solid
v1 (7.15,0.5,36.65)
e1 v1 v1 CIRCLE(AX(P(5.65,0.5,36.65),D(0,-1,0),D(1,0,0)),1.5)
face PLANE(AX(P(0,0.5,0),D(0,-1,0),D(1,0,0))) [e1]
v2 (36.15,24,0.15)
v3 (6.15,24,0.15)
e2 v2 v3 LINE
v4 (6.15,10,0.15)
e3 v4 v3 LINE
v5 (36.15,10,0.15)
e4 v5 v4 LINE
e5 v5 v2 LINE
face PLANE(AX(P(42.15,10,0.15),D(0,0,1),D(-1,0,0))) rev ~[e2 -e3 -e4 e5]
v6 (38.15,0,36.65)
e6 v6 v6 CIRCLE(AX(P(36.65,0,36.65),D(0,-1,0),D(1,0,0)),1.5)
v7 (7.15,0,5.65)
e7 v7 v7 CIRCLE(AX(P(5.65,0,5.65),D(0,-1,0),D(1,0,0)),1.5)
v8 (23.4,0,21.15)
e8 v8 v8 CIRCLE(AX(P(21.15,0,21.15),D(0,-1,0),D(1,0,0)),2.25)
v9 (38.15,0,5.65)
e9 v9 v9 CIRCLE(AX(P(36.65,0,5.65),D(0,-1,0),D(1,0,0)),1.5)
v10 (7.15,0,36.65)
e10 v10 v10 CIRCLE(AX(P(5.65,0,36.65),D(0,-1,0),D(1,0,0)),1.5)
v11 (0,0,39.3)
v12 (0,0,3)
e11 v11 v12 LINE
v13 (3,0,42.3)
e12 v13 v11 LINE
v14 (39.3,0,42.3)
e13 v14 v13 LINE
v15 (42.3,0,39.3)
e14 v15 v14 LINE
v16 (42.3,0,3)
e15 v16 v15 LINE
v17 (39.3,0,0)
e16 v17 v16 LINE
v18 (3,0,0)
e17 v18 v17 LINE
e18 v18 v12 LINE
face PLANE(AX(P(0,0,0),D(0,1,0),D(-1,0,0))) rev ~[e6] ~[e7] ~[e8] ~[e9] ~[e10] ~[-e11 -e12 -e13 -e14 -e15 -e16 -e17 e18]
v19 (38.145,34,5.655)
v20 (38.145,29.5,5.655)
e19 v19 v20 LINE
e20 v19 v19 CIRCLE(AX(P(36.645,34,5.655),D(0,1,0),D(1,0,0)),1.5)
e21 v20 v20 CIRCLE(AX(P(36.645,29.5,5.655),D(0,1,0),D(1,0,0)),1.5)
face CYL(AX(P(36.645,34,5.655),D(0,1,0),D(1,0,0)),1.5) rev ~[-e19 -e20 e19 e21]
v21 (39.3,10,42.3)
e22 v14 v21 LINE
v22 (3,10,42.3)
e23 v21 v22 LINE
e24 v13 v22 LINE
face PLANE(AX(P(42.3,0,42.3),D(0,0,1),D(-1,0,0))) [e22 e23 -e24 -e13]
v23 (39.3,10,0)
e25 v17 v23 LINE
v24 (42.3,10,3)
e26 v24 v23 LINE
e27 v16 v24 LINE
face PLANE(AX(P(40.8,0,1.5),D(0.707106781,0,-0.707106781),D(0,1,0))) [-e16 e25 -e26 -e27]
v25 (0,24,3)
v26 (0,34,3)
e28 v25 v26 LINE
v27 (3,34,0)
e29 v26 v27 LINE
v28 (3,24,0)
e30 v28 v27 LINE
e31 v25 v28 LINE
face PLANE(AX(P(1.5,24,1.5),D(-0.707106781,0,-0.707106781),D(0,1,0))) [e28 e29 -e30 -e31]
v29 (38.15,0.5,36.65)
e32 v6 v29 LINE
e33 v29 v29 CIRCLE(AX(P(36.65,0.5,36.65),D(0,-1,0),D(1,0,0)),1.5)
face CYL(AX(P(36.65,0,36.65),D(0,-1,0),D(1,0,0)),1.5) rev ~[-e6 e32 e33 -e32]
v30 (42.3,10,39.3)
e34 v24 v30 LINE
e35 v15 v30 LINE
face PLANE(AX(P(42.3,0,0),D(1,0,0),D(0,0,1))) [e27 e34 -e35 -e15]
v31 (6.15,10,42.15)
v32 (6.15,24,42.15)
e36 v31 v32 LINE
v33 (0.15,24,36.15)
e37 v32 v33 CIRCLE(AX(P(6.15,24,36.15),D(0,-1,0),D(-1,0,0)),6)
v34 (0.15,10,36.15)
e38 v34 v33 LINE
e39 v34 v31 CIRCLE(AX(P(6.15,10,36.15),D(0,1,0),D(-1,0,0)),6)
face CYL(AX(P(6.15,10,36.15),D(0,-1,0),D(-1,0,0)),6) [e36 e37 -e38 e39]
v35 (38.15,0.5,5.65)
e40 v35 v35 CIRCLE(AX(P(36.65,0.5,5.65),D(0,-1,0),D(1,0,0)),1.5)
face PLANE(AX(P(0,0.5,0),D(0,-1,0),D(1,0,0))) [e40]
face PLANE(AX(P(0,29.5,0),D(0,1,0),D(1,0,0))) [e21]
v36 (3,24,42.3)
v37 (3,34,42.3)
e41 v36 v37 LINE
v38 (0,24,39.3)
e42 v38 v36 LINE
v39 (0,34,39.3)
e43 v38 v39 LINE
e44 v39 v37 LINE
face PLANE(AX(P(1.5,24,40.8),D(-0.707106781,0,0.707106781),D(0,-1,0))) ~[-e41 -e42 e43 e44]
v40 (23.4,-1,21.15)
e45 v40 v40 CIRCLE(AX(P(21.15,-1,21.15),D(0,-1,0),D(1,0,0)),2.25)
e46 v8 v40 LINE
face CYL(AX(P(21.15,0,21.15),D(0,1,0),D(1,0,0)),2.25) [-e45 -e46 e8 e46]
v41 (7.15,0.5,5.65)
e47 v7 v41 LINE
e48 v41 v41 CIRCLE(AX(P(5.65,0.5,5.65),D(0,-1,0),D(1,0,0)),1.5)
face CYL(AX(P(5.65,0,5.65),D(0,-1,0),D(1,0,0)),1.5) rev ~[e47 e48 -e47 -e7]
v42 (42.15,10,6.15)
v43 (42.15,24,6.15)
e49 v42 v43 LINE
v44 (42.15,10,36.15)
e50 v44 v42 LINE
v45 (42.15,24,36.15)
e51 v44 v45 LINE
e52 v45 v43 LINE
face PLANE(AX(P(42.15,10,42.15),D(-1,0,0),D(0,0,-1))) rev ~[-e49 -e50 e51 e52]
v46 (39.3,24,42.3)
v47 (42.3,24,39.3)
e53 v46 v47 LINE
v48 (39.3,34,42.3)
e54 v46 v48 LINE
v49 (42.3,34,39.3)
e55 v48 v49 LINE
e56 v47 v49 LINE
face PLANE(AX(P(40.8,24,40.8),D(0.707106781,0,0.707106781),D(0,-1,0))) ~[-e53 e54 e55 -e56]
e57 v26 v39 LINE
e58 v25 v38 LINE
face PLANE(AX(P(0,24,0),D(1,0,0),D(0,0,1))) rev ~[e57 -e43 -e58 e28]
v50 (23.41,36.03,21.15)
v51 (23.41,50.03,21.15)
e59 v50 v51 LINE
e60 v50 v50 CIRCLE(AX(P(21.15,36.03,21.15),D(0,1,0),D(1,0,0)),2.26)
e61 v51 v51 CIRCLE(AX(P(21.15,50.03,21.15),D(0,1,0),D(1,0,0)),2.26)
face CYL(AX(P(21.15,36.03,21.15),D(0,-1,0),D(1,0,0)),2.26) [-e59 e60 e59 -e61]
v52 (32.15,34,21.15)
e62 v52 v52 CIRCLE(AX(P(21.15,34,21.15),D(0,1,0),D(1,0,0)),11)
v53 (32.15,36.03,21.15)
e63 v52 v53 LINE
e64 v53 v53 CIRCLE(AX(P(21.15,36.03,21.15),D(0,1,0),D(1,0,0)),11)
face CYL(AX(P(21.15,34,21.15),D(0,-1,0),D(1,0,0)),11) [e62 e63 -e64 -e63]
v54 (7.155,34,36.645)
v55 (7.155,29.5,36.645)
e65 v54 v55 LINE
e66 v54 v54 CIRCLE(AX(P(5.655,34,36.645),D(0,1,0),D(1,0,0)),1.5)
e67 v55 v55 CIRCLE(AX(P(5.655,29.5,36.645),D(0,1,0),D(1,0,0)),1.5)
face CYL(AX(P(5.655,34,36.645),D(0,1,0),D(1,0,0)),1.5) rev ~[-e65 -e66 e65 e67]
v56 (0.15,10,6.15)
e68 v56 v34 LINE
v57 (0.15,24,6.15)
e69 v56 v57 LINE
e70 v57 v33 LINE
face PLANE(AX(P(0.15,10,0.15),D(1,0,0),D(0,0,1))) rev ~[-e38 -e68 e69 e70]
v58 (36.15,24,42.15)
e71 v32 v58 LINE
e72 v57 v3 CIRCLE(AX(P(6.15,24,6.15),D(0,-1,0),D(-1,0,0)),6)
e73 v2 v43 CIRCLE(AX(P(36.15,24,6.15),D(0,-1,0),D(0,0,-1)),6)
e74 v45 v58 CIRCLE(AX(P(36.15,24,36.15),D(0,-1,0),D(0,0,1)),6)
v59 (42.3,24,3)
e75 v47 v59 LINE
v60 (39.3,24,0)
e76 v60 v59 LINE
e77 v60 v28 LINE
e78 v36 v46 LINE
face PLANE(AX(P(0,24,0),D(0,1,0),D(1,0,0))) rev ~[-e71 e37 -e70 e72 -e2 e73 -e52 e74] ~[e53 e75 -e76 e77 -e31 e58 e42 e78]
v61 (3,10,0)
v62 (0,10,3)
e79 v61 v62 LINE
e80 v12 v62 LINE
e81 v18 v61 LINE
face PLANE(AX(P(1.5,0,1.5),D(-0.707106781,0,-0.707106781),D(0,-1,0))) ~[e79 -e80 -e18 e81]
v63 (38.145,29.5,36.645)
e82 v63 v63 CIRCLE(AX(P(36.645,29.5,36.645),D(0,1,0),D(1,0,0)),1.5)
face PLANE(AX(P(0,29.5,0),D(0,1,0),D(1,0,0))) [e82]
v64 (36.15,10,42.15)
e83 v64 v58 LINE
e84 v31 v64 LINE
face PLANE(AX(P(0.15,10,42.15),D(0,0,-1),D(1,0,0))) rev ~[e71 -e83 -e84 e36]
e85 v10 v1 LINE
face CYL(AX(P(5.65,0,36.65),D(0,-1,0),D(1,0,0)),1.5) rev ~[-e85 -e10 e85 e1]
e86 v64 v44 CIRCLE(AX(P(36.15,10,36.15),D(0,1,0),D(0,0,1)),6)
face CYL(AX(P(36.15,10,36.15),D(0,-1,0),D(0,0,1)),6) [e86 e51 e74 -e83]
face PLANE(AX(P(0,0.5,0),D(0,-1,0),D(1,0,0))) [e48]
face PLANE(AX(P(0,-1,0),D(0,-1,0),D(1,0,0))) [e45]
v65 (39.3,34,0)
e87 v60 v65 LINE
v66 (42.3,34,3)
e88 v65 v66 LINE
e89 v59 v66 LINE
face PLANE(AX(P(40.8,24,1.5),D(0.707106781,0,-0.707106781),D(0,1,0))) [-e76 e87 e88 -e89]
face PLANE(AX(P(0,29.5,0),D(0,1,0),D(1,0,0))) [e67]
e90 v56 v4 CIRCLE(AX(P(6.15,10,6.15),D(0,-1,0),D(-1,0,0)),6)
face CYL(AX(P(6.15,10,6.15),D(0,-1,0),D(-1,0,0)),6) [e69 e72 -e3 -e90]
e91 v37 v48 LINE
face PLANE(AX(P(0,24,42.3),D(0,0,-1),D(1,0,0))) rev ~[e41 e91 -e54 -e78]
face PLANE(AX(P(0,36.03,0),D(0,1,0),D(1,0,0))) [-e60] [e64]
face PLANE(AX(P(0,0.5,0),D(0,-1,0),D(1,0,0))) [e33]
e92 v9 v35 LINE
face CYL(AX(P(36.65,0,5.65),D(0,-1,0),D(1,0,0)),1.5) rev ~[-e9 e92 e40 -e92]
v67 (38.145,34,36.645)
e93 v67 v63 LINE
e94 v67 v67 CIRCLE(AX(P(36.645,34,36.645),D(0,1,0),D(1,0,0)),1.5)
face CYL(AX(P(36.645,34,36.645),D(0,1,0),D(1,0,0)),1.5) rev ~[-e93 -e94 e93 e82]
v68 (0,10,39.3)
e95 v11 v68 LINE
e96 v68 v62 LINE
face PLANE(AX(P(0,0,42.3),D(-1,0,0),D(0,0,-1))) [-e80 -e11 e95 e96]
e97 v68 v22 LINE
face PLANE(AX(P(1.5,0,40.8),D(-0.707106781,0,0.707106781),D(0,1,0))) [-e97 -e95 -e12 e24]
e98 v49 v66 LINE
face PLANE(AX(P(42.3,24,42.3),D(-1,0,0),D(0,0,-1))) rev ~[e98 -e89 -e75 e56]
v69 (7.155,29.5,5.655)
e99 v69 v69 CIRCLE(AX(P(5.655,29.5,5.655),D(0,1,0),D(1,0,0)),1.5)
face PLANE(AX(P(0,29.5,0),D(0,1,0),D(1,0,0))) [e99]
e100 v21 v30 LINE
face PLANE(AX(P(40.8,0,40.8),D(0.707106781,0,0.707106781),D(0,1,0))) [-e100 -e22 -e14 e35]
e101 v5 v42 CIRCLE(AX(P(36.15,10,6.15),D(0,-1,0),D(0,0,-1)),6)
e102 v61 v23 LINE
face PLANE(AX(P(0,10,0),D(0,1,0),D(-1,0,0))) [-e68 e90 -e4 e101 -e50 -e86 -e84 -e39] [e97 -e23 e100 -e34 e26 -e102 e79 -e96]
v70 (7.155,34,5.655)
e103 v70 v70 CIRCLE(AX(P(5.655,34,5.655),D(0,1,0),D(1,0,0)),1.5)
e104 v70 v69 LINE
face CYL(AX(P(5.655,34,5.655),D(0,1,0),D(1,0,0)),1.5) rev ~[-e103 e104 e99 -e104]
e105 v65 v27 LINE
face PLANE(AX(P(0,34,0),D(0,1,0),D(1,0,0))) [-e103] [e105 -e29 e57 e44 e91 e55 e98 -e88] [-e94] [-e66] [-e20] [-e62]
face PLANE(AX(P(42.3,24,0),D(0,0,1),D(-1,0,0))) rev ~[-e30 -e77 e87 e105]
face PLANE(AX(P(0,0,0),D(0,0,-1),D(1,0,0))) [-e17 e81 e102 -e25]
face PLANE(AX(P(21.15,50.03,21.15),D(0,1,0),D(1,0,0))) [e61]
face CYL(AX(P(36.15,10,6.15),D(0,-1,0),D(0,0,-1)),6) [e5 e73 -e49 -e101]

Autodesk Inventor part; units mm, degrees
ref_plane "YZ Plane" through (0, 0, 0) normal (1, 0, 0) x (0, 1, 0)
ref_plane "XZ Plane" through (0, 0, 0) normal (0, 1, 0) x (-1, 0, 0)
sketch "Sketch1" plane through (0, 0, 0) normal (0, 1, 0) x (-1, 0, 0)
  line L0 (0, 0) -> (-42.3, 0)
  line L1 (-42.3, 0) -> (-42.3, 42.3)
  line L2 (-42.3, 42.3) -> (0, 42.3)
  line L3 (0, 42.3) -> (0, 0)
  dimension "d0" = 42.3
  dimension "d1" = 42.3
extrude "Extrusion1" add sketch "Sketch1" along normal blind 10
chamfer "Chamfer1" distance 3 angle 45 4 edges at (42.3, 5, 42.3) (0, 5, 42.3) (0, 5, 0) (42.3, 5, 0)
sketch "Sketch2" plane through (0, 10, 0) normal (0, 1, 0) x (1, 0, 0)
  line L0 (0.15, -42.15) -> (42.15, -42.15)
  line L1 (42.15, -42.15) -> (42.15, -0.15)
  line L2 (42.15, -0.15) -> (0.15, -0.15)
  line L3 (0.15, -0.15) -> (0.15, -42.15)
  line L4 (0.15, -42.15) -> (42.15, -0.15) construction
  line L5 (42.15, -42.15) -> (0.15, -0.15) construction
  point P0 (0, 0)
  point P1 (21.15, -21.15)
  dimension "d7" = 42
  dimension "d8" = 42
extrude "Extrusion2" add sketch "Sketch2" along normal blind 14
fillet "Fillet1" radius 6 4 edges at (42.15, 17, 42.15) (42.15, 17, 0.15) (0.15, 17, 42.15) (0.15, 17, 0.15)
sketch "Sketch3" plane through (0, 24, 0) normal (0, 1, 0) x (1, 0, 0)
  line L0 (0, -42.3) -> (42.3, -42.3)
  line L1 (42.3, -42.3) -> (42.3, 0)
  line L2 (42.3, 0) -> (0, 0)
  line L3 (0, 0) -> (0, -42.3)
  line L4 (0, -42.3) -> (42.3, 0) construction
  line L5 (42.3, -42.3) -> (0, 0) construction
  point P0 (0, 0)
  point P1 (21.15, -21.15)
  dimension "d12" = 42.3
  dimension "d13" = 42.3
extrude "Extrusion3" add sketch "Sketch3" along normal blind 10
chamfer "Chamfer2" distance 3 angle 45 4 edges at (42.3, 29, 42.3) (42.3, 29, 0) (0, 29, 0) (0, 29, 42.3)
ref_plane "Work Plane1" through (39.3, 0, 21.15) normal (0, 0, -1) x (-1, 0, 0)
sketch "Sketch4" plane through (0, 34, 0) normal (0, 1, 0) x (1, 0, 0)
  circle A0 centre (21.15, -21.15) radius 11
  point P0 (0, 0)
  dimension "d19" = 22
extrude "Extrusion4" add sketch "Sketch4" along normal blind 2.03
sketch "Sketch5" plane through (21.15, 36.03, 21.15) normal (0, 1, 0) x (1, 0, 0)
  circle A0 centre (0, 0) radius 11 projected
  circle A1 centre (0, 0) radius 2.26
  point P0 (-21.15, 21.15)
  dimension "d22" = 4.52
extrude "Extrusion5" add sketch "Sketch5" along normal blind 14 contours A1
sketch "Sketch6" plane through (0, 34, 0) normal (0, 1, 0) x (1, 0, 0)
  circle A0 centre (21.15, -21.15) radius 11 projected
  line L0 (5.655, -36.645) -> (36.645, -5.655) construction
  line L1 (36.645, -36.645) -> (5.655, -5.655) construction
  circle A1 centre (5.655, -5.655) radius 1.5
  circle A2 centre (36.645, -5.655) radius 1.5
  circle A3 centre (36.645, -36.645) radius 1.5
  circle A4 centre (5.655, -36.645) radius 1.5
  point P0 (0, 0)
  dimension "d25" = 30.99
  dimension "d26" = 30.99
  dimension "d27" = 3
  dimension "d28" = 3
  dimension "d29" = 3
  dimension "d30" = 3
extrude "Extrusion6" cut sketch "Sketch6" against normal blind 4.5 contours A1 | A2 | A3 | A4
thread "Thread1" size "M3x0.5" class "6H" standard "ANSI Metric M Profile" full length
thread "Thread2" size "M3x0.5" class "6H" standard "ANSI Metric M Profile" full length
thread "Thread3" size "M3x0.5" class "6H" standard "ANSI Metric M Profile" full length
thread "Thread4" size "M3x0.5" class "6H" standard "ANSI Metric M Profile" full length
sketch "Sketch7" plane through (0, 0, 0) normal (0, -1, 0) x (1, 0, 0)
  circle A0 centre (21.15, 21.15) radius 2.25
  point P0 (0, 0)
  dimension "d41" = 4.5
extrude "Extrusion7" add sketch "Sketch7" along normal blind 1
sketch "Sketch8" plane through (0, 0, 0) normal (0, -1, 0) x (1, 0, 0)
  line L0 (5.65, 5.65) -> (36.65, 36.65) construction
  line L1 (36.65, 5.65) -> (5.65, 36.65) construction
  circle A0 centre (5.65, 36.65) radius 1.5
  circle A1 centre (36.65, 36.65) radius 1.5
  circle A2 centre (36.65, 5.65) radius 1.5
  circle A3 centre (5.65, 5.65) radius 1.5
  point P0 (0, 0)
  point P1 (21.15, 21.15)
  dimension "d44" = 31
  dimension "d45" = 31
  dimension "d46" = 3
  dimension "d47" = 3
  dimension "d48" = 3
  dimension "d49" = 3
extrude "Extrusion8" cut sketch "Sketch8" against normal blind 0.5
properties part number "NEMA17"
